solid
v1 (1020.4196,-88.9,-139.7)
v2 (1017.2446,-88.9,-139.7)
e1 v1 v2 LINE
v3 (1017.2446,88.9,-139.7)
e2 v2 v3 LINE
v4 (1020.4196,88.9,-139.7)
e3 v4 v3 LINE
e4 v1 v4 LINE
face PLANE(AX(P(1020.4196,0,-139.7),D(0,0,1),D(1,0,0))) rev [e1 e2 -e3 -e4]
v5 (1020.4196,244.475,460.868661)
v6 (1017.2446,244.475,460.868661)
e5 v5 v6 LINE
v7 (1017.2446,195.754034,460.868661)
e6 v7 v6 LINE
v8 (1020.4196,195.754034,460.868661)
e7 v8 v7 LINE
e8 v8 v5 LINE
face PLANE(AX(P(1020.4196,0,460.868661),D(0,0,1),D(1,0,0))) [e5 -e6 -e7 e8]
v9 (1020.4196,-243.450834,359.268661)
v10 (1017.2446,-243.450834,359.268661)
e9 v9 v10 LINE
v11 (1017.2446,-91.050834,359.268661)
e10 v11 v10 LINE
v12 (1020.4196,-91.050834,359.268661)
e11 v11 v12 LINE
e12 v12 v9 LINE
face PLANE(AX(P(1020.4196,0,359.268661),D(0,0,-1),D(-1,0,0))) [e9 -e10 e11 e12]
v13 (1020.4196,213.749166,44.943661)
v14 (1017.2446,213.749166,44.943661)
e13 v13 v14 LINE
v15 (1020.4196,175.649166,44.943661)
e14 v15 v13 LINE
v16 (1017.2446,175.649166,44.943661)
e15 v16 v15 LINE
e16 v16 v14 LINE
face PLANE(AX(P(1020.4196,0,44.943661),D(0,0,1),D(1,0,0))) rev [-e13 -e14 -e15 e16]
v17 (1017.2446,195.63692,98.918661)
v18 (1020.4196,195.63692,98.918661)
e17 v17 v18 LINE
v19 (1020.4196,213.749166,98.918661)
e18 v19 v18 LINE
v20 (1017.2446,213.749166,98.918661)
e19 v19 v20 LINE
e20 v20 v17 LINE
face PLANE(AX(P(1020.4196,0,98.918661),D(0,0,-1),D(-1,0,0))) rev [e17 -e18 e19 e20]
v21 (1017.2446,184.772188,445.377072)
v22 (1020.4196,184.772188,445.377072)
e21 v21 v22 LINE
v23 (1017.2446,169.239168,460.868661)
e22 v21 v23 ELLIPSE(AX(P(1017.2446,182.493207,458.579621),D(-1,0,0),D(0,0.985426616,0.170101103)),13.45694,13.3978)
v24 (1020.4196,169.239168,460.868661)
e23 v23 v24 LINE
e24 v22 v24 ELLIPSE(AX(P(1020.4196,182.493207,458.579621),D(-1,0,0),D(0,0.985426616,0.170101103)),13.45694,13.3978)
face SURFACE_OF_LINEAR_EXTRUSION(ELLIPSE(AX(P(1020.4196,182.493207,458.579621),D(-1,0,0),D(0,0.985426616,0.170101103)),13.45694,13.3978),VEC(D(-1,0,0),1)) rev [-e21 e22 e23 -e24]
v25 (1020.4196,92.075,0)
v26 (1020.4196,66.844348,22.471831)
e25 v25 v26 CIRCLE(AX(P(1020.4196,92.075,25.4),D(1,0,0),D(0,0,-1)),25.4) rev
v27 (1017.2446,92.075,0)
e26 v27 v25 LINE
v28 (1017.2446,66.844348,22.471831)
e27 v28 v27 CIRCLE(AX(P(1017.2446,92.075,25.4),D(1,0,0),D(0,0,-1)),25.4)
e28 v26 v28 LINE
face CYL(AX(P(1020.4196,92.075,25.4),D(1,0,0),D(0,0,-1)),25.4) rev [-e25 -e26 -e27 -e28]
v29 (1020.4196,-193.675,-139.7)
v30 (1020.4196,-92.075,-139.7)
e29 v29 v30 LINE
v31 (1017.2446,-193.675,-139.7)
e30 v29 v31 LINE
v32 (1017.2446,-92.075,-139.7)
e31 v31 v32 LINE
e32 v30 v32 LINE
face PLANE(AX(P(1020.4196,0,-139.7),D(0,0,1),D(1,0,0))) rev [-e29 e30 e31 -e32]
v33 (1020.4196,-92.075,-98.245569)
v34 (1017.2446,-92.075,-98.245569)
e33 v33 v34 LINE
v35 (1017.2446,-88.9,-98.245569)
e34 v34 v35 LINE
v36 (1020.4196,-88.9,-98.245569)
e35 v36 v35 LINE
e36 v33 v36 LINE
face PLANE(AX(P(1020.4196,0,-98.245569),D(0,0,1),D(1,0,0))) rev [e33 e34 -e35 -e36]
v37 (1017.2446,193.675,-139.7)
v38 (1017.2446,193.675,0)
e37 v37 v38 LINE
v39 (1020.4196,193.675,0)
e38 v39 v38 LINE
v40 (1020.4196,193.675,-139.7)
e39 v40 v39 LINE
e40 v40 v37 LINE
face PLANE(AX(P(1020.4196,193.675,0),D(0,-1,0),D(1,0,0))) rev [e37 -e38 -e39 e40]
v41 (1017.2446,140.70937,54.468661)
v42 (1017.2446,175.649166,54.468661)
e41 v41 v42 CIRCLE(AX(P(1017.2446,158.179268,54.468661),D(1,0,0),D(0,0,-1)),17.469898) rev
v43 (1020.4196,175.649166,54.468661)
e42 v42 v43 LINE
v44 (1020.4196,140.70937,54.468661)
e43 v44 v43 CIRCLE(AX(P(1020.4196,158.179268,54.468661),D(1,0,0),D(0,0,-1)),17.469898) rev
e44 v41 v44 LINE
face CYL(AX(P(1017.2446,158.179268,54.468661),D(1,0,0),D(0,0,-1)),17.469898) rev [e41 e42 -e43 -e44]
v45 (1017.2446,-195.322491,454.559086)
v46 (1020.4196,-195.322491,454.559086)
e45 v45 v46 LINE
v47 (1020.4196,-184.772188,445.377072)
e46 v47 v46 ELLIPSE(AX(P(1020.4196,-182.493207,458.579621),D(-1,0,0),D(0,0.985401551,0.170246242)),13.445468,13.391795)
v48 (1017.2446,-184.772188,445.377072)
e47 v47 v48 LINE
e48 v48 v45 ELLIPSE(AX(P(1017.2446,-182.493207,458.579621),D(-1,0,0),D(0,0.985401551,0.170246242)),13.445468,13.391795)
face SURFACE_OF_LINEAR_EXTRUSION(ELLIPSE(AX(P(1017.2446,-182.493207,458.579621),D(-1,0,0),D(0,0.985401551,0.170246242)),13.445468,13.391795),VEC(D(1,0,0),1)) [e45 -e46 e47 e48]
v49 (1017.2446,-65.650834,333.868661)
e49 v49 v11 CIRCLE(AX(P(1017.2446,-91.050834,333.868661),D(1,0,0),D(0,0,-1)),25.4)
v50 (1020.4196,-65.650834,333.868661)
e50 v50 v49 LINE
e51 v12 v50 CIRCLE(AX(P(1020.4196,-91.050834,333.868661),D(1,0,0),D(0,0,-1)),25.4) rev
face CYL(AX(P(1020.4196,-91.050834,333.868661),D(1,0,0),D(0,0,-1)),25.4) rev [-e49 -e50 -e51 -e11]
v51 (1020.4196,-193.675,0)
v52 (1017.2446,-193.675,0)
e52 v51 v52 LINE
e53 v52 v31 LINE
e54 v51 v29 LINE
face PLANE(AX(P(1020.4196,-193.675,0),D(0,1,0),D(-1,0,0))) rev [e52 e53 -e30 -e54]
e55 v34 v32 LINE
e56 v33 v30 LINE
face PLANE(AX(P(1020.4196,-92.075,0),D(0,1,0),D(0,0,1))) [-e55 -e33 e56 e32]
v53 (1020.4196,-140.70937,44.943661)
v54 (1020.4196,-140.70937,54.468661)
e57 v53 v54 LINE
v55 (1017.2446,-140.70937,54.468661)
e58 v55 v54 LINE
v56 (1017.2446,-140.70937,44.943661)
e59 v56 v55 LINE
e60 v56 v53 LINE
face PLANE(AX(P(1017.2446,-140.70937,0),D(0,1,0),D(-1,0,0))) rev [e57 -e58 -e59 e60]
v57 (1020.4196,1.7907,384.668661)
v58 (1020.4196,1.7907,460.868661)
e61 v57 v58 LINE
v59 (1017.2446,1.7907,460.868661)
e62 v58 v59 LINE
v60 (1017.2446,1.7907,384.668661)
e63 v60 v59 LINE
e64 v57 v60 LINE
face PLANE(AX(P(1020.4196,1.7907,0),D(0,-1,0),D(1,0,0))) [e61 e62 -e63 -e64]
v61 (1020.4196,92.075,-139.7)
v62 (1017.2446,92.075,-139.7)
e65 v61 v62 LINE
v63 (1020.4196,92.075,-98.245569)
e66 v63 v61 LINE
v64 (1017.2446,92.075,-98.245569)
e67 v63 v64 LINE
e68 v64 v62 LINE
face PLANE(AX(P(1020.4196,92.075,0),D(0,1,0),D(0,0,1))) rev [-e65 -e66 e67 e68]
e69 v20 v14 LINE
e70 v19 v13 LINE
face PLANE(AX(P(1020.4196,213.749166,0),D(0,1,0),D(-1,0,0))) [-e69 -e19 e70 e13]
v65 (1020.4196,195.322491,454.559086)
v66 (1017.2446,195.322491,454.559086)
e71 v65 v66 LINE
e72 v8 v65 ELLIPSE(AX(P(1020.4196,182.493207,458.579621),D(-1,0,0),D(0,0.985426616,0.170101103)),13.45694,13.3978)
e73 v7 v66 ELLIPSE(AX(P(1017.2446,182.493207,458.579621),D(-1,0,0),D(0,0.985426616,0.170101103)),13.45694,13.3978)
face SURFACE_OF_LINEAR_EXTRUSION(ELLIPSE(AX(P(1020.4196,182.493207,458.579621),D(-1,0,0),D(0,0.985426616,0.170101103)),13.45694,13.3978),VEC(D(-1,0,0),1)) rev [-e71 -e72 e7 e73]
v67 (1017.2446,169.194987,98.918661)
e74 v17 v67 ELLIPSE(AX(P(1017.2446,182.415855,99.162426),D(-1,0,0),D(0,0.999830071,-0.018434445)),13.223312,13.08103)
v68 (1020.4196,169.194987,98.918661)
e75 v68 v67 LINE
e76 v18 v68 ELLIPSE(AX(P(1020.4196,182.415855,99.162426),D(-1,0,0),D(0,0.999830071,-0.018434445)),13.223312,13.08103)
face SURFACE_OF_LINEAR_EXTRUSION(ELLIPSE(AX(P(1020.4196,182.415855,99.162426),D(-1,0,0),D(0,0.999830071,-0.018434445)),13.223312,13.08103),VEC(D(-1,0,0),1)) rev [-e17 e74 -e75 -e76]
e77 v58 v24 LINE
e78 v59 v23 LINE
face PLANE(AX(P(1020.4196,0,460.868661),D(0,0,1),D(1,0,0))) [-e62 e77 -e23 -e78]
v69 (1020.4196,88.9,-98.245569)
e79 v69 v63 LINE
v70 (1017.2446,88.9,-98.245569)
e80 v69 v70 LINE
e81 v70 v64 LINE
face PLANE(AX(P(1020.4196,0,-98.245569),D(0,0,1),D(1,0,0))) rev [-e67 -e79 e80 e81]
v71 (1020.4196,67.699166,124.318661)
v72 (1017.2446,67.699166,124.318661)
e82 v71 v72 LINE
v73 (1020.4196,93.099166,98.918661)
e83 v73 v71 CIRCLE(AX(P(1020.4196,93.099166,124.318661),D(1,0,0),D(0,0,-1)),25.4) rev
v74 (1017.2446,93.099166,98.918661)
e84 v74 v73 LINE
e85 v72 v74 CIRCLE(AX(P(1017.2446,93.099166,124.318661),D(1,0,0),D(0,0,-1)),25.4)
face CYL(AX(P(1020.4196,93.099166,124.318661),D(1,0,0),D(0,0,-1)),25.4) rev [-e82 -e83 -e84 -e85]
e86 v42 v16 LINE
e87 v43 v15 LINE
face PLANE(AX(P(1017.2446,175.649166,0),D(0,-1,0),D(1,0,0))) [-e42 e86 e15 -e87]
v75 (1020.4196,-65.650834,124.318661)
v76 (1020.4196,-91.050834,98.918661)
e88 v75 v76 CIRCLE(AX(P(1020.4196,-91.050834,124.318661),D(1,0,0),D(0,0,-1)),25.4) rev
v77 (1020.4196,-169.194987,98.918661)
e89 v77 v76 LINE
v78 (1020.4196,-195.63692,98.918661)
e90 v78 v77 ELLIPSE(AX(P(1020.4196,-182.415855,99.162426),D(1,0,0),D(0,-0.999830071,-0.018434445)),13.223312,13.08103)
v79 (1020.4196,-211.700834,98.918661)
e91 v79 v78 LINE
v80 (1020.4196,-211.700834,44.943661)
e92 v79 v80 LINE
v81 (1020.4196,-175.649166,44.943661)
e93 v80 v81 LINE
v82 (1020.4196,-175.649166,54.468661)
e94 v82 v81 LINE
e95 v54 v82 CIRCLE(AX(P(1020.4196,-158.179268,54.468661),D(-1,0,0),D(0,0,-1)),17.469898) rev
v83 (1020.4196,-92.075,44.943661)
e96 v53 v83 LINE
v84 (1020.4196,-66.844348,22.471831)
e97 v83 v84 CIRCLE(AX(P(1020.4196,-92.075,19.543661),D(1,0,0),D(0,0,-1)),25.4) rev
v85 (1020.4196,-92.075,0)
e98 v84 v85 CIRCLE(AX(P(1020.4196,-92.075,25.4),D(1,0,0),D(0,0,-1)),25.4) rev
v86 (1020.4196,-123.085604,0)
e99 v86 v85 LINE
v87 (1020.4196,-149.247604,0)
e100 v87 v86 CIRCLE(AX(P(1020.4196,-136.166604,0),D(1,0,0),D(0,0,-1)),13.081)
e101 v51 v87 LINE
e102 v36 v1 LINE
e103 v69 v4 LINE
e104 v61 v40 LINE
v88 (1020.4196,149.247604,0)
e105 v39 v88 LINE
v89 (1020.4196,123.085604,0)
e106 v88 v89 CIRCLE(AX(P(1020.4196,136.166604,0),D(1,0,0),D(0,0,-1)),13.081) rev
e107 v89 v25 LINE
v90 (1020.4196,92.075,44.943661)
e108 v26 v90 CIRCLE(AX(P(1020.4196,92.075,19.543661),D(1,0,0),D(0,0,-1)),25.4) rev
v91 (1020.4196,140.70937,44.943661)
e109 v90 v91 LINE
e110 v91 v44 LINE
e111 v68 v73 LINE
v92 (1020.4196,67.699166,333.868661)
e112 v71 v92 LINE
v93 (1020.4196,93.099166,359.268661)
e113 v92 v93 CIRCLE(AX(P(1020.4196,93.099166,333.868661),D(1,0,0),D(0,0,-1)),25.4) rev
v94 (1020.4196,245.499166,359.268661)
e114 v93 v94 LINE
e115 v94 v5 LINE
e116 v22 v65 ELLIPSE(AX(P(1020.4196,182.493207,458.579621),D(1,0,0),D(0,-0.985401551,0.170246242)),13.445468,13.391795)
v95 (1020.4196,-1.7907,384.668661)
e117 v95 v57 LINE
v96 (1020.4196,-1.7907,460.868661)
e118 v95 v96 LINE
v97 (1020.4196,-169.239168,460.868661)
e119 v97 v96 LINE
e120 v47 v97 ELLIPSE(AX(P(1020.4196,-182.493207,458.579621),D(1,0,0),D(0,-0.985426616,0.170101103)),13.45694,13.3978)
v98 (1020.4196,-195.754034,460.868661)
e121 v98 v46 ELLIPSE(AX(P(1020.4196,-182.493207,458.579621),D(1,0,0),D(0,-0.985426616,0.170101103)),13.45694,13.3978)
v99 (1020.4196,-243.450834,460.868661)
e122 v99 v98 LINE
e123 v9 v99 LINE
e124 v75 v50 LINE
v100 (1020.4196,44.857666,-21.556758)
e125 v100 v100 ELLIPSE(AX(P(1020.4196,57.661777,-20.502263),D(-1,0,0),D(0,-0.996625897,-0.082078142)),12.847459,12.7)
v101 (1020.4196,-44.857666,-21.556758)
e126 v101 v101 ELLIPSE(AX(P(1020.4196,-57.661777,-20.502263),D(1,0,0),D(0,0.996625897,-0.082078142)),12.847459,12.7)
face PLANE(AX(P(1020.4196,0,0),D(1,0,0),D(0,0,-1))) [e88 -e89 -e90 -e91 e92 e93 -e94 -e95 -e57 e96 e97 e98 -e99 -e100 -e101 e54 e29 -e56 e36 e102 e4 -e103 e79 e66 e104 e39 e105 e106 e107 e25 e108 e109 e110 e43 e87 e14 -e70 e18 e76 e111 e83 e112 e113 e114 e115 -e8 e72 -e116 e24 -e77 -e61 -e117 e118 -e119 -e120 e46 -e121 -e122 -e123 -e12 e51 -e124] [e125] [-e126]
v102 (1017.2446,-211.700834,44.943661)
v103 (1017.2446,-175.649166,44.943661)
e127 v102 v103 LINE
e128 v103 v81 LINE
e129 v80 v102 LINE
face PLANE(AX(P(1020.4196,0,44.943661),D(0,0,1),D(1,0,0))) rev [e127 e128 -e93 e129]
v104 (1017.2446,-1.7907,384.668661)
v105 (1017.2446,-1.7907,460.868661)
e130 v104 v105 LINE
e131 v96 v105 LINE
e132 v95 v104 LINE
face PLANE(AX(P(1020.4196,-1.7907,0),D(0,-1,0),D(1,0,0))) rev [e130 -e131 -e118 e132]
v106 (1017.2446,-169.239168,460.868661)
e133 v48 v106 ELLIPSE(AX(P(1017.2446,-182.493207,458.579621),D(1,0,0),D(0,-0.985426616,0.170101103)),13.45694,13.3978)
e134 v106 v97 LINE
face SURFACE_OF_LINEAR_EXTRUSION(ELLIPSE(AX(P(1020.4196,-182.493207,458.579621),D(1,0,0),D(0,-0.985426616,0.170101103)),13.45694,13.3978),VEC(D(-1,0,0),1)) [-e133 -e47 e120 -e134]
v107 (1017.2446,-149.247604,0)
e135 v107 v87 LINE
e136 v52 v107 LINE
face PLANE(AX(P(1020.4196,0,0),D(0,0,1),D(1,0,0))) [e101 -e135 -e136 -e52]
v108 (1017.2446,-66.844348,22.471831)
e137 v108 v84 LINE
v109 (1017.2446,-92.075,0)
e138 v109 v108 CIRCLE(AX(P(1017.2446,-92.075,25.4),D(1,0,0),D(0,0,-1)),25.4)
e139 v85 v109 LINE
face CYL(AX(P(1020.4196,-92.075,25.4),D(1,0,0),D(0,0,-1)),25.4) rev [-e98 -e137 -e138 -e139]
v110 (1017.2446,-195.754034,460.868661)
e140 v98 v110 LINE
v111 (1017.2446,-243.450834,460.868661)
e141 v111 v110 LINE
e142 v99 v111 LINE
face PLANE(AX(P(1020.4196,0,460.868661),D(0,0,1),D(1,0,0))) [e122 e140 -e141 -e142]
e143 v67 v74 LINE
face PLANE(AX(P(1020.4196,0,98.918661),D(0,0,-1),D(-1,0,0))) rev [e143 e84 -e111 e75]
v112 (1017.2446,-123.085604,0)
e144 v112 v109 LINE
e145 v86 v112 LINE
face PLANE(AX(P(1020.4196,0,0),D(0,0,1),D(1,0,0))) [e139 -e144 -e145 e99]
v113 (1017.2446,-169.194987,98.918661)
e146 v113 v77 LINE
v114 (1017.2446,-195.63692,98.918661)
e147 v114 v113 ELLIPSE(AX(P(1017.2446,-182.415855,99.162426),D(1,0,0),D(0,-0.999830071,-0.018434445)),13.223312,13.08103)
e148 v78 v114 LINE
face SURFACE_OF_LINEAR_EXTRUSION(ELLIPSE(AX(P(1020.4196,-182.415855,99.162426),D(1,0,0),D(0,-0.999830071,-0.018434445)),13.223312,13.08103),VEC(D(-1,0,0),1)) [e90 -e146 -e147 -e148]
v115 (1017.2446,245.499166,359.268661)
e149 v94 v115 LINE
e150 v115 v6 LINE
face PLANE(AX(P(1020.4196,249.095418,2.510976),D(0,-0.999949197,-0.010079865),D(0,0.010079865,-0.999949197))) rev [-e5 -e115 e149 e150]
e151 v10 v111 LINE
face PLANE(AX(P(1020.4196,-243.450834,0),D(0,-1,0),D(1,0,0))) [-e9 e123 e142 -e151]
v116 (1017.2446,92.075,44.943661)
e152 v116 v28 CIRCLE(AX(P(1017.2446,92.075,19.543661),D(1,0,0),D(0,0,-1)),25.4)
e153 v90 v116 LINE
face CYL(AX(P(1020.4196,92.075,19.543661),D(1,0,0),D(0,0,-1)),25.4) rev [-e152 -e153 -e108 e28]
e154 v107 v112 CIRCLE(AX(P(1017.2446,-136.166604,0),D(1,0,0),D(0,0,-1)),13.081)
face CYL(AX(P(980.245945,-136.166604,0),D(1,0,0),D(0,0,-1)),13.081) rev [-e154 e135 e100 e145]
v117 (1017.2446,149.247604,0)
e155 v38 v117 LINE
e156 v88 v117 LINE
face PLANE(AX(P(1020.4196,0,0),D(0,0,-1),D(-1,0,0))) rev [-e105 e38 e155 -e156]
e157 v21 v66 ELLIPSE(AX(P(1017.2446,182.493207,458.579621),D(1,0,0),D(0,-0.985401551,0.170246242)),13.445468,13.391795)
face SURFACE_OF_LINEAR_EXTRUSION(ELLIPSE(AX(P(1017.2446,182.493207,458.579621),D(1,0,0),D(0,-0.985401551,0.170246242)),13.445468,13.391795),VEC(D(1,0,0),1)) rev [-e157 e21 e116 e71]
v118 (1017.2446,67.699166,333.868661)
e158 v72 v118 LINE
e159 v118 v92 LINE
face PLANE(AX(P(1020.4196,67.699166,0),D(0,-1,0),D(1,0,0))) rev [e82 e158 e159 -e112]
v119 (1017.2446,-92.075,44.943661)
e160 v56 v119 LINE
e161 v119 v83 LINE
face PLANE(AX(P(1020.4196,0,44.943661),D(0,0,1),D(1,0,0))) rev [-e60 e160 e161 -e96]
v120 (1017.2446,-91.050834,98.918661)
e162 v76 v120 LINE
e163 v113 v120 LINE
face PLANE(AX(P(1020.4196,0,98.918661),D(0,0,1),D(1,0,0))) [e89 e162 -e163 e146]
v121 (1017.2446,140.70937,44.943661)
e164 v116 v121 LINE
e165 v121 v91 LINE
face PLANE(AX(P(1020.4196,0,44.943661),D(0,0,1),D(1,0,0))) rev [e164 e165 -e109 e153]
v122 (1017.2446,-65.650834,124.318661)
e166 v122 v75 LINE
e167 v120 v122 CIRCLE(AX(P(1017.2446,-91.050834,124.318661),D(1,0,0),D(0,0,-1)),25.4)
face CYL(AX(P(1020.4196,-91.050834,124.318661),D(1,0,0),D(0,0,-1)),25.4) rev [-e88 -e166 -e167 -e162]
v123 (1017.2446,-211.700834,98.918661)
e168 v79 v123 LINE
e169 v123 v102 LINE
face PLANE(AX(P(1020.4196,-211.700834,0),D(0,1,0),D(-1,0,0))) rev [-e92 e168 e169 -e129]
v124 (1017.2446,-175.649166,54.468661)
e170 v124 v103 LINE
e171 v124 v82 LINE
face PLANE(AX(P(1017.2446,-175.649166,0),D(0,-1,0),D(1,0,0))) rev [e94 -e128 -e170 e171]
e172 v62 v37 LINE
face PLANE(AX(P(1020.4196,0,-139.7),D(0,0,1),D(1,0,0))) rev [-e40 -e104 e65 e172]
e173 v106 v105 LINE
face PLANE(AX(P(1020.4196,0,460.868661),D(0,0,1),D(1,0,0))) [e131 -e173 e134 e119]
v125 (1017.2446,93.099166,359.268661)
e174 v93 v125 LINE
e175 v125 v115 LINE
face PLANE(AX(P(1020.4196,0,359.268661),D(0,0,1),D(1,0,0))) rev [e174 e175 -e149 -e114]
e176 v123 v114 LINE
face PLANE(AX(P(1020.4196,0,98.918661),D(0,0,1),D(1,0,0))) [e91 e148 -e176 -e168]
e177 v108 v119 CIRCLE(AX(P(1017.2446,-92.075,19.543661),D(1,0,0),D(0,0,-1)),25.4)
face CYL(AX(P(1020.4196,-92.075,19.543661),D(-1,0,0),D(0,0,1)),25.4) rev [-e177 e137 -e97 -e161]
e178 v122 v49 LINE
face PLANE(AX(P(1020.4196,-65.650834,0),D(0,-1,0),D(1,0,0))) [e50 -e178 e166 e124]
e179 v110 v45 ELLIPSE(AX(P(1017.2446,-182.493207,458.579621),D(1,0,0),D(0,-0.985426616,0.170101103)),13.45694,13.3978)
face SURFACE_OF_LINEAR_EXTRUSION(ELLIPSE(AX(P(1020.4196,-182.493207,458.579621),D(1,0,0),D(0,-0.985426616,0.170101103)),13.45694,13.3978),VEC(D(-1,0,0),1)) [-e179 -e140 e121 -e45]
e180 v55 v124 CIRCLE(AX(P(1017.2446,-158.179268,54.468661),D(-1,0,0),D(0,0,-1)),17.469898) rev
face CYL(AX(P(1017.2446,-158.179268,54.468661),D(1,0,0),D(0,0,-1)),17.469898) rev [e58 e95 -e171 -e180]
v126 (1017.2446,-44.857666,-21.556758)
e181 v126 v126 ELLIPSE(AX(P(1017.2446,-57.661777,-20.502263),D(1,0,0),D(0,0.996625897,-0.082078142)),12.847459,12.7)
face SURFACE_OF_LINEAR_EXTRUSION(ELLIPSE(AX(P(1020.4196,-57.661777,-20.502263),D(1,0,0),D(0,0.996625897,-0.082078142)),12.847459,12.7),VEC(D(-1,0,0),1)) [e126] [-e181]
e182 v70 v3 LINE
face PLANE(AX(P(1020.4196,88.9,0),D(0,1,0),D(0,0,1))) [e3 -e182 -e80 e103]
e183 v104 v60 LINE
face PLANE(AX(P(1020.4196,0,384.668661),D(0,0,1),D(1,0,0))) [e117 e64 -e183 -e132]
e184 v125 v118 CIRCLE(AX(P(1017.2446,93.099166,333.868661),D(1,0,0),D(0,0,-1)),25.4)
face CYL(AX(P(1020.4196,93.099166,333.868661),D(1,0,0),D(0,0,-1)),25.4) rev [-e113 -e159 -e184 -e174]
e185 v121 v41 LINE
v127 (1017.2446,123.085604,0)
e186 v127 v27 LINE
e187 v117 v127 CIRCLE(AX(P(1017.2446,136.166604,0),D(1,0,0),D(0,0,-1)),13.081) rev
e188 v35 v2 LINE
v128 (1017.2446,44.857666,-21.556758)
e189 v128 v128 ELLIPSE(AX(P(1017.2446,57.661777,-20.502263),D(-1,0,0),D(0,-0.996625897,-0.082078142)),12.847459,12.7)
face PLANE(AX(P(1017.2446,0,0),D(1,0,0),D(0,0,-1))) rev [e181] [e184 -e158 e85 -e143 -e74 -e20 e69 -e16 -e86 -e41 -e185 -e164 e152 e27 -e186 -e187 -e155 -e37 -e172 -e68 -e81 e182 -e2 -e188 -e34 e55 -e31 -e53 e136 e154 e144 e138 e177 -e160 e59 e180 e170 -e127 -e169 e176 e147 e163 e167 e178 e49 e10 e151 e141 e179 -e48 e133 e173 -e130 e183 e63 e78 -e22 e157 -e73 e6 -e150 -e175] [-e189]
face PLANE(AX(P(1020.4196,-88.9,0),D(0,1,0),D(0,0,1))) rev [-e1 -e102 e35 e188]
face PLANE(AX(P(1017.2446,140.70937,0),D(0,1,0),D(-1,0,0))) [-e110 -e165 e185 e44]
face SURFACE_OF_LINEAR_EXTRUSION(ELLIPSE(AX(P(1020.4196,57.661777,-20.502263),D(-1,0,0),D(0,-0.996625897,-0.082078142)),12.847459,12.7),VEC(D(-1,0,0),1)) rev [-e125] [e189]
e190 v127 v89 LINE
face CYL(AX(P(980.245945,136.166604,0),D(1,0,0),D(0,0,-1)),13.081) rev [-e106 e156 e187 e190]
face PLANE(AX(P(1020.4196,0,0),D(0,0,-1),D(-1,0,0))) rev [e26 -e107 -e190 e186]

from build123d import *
from OCP.BRepAlgoAPI import BRepAlgoAPI_Cut
from OCP.TopTools import TopTools_ListOfShape

# Parameters (mm, degrees)
BOSS_EXTRUDE1_DEPTH = 1.5875
SKETCH2_R           = 13.081
CUT_EXTRUDE1_DEPTH  = 117.6782
CUT_EXTRUDE2_REACH  = 864.179
SKETCH3_R           = 13.081
SKETCH7_RX          = 13.456940142
SKETCH7_RY          = 13.355964413
CUT_EXTRUDE5_DEPTH  = 523.187556795
SKETCH9_RX          = 13.445467768
SKETCH9_RY          = 13.391794978
CUT_EXTRUDE6_DEPTH  = 523.187556795
SKETCH10_RX         = 13.456940142
SKETCH10_RY         = 13.397800125
CUT_EXTRUDE7_DEPTH  = 523.187556799
CUT_EXTRUDE8_REACH  = 572.923
SKETCH11_R          = 13.081
SKETCH19_RX         = 13.223312173
SKETCH19_RY         = 13.081030132
CUT_EXTRUDE13_DEPTH = 523.187556806
MIRROR1_START       = 1016
MIRROR1_DEPTH       = 5
FILLET1_START       = 1017.2446
FILLET1_DEPTH       = 3.175
CUT_EXTRUDE14_DEPTH = 523.187556802


with BuildPart() as part:
    # Sketch1 → Boss-Extrude1 (new, symmetric)
    with BuildSketch(Plane(origin=(1018.8321, 0, 0), x_dir=(0, 0, -1), z_dir=(1, 0, 0))):
        Polygon((-44.943661408, 213.749166265), (-98.918661408, 213.749166265), (-98.918661408, 67.699166265), (-359.268661408, 67.699166265), (-359.268661408, 245.499166265), (-460.868661408, 244.475), (-460.868661408, 66.675), (-460.868661408, 1.7907), (-384.668661408, 1.7907), (-384.668661408, -1.7907), (-460.868661408, -1.7907), (-460.868661408, -66.675), (-460.868661408, -243.450833735), (-359.268661408, -243.450833735), (-359.268661408, -65.650833735), (-98.918661408, -65.650833735), (-98.918661408, -211.700833735), (-44.943661408, -211.700833735), (-44.943661408, -66.675), (0, -66.675), (0, -193.675), (139.7, -193.675), (139.7, -92.075), (98.24556941, -92.075), (98.24556941, -88.9), (139.7, -88.9), (139.7, 88.9), (98.24556941, 88.9), (98.24556941, 92.075), (139.7, 92.075), (139.7, 193.675), (0, 193.675), (0, 66.675), (-44.943661408, 66.675), align=None)
        with BuildLine():
            add(Edge.make_bspline(
                [(21.556758498, -44.857666301), (-0.366066463, -43.052189708), (9.01360266, -63.161093791), (18.393271782, -83.269997873), (30.936427621, -64.966570384), (43.479583459, -46.663142895), (21.556758498, -44.857666301)],
                knots=[0, 0, 0, 2.094395102, 2.094395102, 4.188790205, 4.188790205, 6.283185307, 6.283185307, 6.283185307], degree=2, weights=[1, 0.5, 1, 0.5, 1, 0.5, 1]))
        make_face(mode=Mode.SUBTRACT)
        with BuildLine():
            add(Edge.make_bspline(
                [(21.556758498, 44.857666301), (43.479583459, 46.663142895), (30.936427621, 64.966570384), (18.393271782, 83.269997873), (9.01360266, 63.161093791), (-0.366066463, 43.052189708), (21.556758498, 44.857666301)],
                knots=[0, 0, 0, 2.094395102, 2.094395102, 4.188790205, 4.188790205, 6.283185307, 6.283185307, 6.283185307], degree=2, weights=[1, 0.5, 1, 0.5, 1, 0.5, 1]))
        make_face(mode=Mode.SUBTRACT)
    extrude(amount=BOSS_EXTRUDE1_DEPTH, both=True)

    # Sketch2 → Cut-Extrude1 (cut)
    with BuildSketch(Plane(origin=(1134.9228, 136.166603714, 0), x_dir=(0, 0, 1), z_dir=(-1, 0, 0))):
        Circle(SKETCH2_R)
    extrude(amount=CUT_EXTRUDE1_DEPTH, mode=Mode.SUBTRACT)

    # Cut-Extrude2: up to this plane
    cut_extrude2_end = Plane(origin=(1017.2446, 0, 0), z_dir=(1, 0, 0))
    # Sketch3 → Cut-Extrude2 (cut, up to the surface)
    with BuildSketch(Plane(origin=(1630.2228, 139.7, 330.2), x_dir=(0.2050222561191695, -0.014387526745204883, 0.9786515588144545), z_dir=(-0.9762506927412319, 0.06850882054324438, 0.20552646162973348)), mode=Mode.PRIVATE) as cut_extrude2_sk1:
        Circle(SKETCH3_R)
    cut_extrude2_tool1 = split(extrude(cut_extrude2_sk1.sketch, amount=CUT_EXTRUDE2_REACH, mode=Mode.PRIVATE), bisect_by=cut_extrude2_end, keep=Keep.BOTH, mode=Mode.PRIVATE)
    add(cut_extrude2_tool1.solids().sort_by_distance((1630.2228, 139.7, 330.2))[0], mode=Mode.SUBTRACT)

    # Sketch7 → Cut-Extrude5 (cut, through all)
    with BuildSketch(Plane.ZY.offset(-1017.2446)):
        with Locations(Location((458.579621053, 182.493207018), (0, 0, 80.206302576))):
            Ellipse(SKETCH7_RX, SKETCH7_RY)
    extrude(amount=-CUT_EXTRUDE5_DEPTH, mode=Mode.SUBTRACT)

    # Sketch9 → Cut-Extrude6 (cut, through all)
    with BuildSketch(Plane(origin=(1020.4196, 0, 0), x_dir=(0, 0, -1), z_dir=(1, 0, 0))):
        with Locations(Location((-458.579621053, 182.493207018), (0, 0, -99.802136374))):
            Ellipse(SKETCH9_RX, SKETCH9_RY)
    extrude(amount=-CUT_EXTRUDE6_DEPTH, mode=Mode.SUBTRACT)

    # Sketch10 → Cut-Extrude7 (cut, through all)
    with BuildSketch(Plane.ZY.offset(-1017.2446)):
        with Locations(Location((458.579621053, 182.493207018), (0, 0, 80.206302562))):
            Ellipse(SKETCH10_RX, SKETCH10_RY)
    extrude(amount=-CUT_EXTRUDE7_DEPTH, mode=Mode.SUBTRACT)

    # Cut-Extrude8: up to this plane
    cut_extrude8_end = Plane(origin=(1017.2446, 0, 0), z_dir=(1, 0, 0))
    # Sketch11 → Cut-Extrude8 (cut, up to the surface)
    with BuildSketch(Plane(origin=(1134.9228, 182.523820118, 99.41306), x_dir=(0.0021298200845781975, 1.9540206598432437e-06, -0.9999977319287225), z_dir=(0.9999973110652725, 0.0009174556197295962, 0.0021298209809440367)), mode=Mode.PRIVATE) as cut_extrude8_sk1:
        Circle(SKETCH11_R)
    cut_extrude8_tool1 = split(extrude(cut_extrude8_sk1.sketch, amount=-CUT_EXTRUDE8_REACH, mode=Mode.PRIVATE), bisect_by=cut_extrude8_end, keep=Keep.BOTH, mode=Mode.PRIVATE)
    add(cut_extrude8_tool1.solids().sort_by_distance((1134.9228, 182.52382, 99.41306))[0], mode=Mode.SUBTRACT)


with BuildPart() as cut_extrude13_tool:
    # Sketch19 → Cut-Extrude13 (new, through all)
    with BuildSketch(Plane.ZY.offset(-1017.2446)):
        with Locations(Location((99.162425827, 182.415855302), (0, 0, 91.056275717))):
            Ellipse(SKETCH19_RX, SKETCH19_RY)
    extrude(amount=-CUT_EXTRUDE13_DEPTH)


with BuildPart() as part_1:
    add(part.part)

    # Cut-Extrude13: cut by cut_extrude13_tool, with a tolerance
    cut_extrude13_stock = TopTools_ListOfShape()
    cut_extrude13_stock.Append(part_1.part.wrapped)
    cut_extrude13_tools = TopTools_ListOfShape()
    cut_extrude13_tools.Append(cut_extrude13_tool.part.wrapped)
    cut_extrude13_cut = BRepAlgoAPI_Cut()
    cut_extrude13_cut.SetArguments(cut_extrude13_stock)
    cut_extrude13_cut.SetTools(cut_extrude13_tools)
    cut_extrude13_cut.SetFuzzyValue(0.00001)
    cut_extrude13_cut.Build()
    add(Compound.cast(cut_extrude13_cut.Shape()).solids(), mode=Mode.REPLACE)

    # Mirror1: read off the stored shape, not the designer's step
    # Mirror1 outline → Mirror1 (cut)
    with BuildSketch(Plane.YZ.offset(MIRROR1_START)):
        with BuildLine():
            add(Edge.make_bspline(
                [(-184.772187594, 445.377072218), (-192.867269369, 446.753422284), (-195.322490897, 454.559086735)],
                knots=[1.911546311, 1.911546311, 1.911546311, 3.008453954, 3.008453954, 3.008453954], degree=2, weights=[1, 0.85333167, 1]))
            add(Edge.make_bspline(
                [(-184.772187594, 445.377072218), (-165.948609057, 442.127807973), (-169.239167993, 460.868661408)],
                knots=[1.570796327, 1.570796327, 1.570796327, 3.484936818, 3.484936818, 3.484936818], degree=2, weights=[1, 0.575917551, 1]))
            Line((-169.239167993, 460.868661408), (-195.754033999, 460.868661411))
            add(Edge.make_bspline(
                [(-195.754033999, 460.868661411), (-196.307414343, 457.662828466), (-195.322490897, 454.559086735)],
                knots=[0, 0, 0, 0.476417942, 0.476417942, 0.476417942], degree=2, weights=[1, 0.971762149, 1]))
        make_face()
        with BuildLine():
            Line((-169.194986689, 98.918661408), (-195.636920453, 98.918661408))
            add(Edge.make_bspline(
                [(-195.636920453, 98.918661408), (-195.40023147, 86.081347081), (-182.421128696, 86.081347081), (-169.442025922, 86.081347081), (-169.194986689, 98.918661408)],
                knots=[0, 0, 0, 1.552160362, 1.552160362, 3.104320723, 3.104320723, 3.104320723], degree=2, weights=[1, 0.713664798, 1, 0.713664798, 1]))
        make_face()
        with BuildLine():
            Line((-123.085603714, 0), (-149.247603714, 0))
            ThreePointArc((-149.247603714, 0), (-136.166603714, -13.081), (-123.085603714, 0))
        make_face()
    extrude(amount=MIRROR1_DEPTH, mode=Mode.SUBTRACT)

    # Fillet1: read off the stored shape, not the designer's step
    # Fillet1 outline → Fillet1 (add)
    with BuildSketch(Plane.YZ.offset(FILLET1_START)):
        with BuildLine():
            ThreePointArc((93.099166265, 98.918661408), (75.138654023, 106.358149166), (67.699166265, 124.318661408))
            Line((67.699166265, 124.318661408), (67.699166265, 98.918661408))
            Line((67.699166265, 98.918661408), (93.099166265, 98.918661408))
        make_face()
        with BuildLine():
            ThreePointArc((67.699166265, 333.868661408), (75.138654023, 351.82917365), (93.099166265, 359.268661408))
            Line((93.099166265, 359.268661408), (67.699166265, 359.268661408))
            Line((67.699166265, 359.268661408), (67.699166265, 333.868661408))
        make_face()
        with BuildLine():
            ThreePointArc((-91.050833735, 359.268661408), (-73.090321493, 351.82917365), (-65.650833735, 333.868661408))
            Line((-65.650833735, 333.868661408), (-65.650833735, 359.268661408))
            Line((-65.650833735, 359.268661408), (-91.050833735, 359.268661408))
        make_face()
        with BuildLine():
            Line((-65.650833735, 98.918661408), (-65.650833735, 124.318661408))
            ThreePointArc((-65.650833735, 124.318661408), (-73.090321493, 106.358149166), (-91.050833735, 98.918661408))
            Line((-91.050833735, 98.918661408), (-65.650833735, 98.918661408))
        make_face()
        with BuildLine():
            ThreePointArc((-66.84434752, 22.471830704), (-75.181443538, 6.43245535), (-92.075, 0))
            Line((-92.075, 0), (-66.675, 0))
            Line((-66.675, 0), (-66.675, 44.943661408))
            Line((-66.675, 44.943661408), (-92.075, 44.943661408))
            ThreePointArc((-92.075, 44.943661408), (-75.181443538, 38.511206058), (-66.84434752, 22.471830704))
        make_face()
        with BuildLine():
            ThreePointArc((92.075, 0), (75.181443538, 6.43245535), (66.84434752, 22.471830704))
            ThreePointArc((66.84434752, 22.471830704), (75.181443538, 38.511206058), (92.075, 44.943661408))
            Line((92.075, 44.943661408), (66.675, 44.943661408))
            Line((66.675, 44.943661408), (66.675, 0))
            Line((66.675, 0), (92.075, 0))
        make_face()
    extrude(amount=FILLET1_DEPTH)

    # Sketch20 → Cut-Extrude14 (cut, through all)
    with BuildSketch(Plane(origin=(1020.4196, 0, 0), x_dir=(0, 0, -1), z_dir=(1, 0, 0))):
        with BuildLine():
            Line((-54.468661408, 140.709369646), (-44.943661408, 140.709369646))
            Line((-44.943661408, 140.709369646), (-44.943661408, 175.649166265))
            Line((-44.943661408, 175.649166265), (-54.468661408, 175.649166265))
            ThreePointArc((-54.468661408, 175.649166265), (-71.938559718, 158.179267956), (-54.468661408, 140.709369646))
        make_face()
    cut_extrude14 = extrude(amount=-CUT_EXTRUDE14_DEPTH, mode=Mode.SUBTRACT)

    # Mirror2: Cut-Extrude14 across plane
    add(cut_extrude14.mirror(Plane.ZX), mode=Mode.SUBTRACT)


solid = part_1.part
